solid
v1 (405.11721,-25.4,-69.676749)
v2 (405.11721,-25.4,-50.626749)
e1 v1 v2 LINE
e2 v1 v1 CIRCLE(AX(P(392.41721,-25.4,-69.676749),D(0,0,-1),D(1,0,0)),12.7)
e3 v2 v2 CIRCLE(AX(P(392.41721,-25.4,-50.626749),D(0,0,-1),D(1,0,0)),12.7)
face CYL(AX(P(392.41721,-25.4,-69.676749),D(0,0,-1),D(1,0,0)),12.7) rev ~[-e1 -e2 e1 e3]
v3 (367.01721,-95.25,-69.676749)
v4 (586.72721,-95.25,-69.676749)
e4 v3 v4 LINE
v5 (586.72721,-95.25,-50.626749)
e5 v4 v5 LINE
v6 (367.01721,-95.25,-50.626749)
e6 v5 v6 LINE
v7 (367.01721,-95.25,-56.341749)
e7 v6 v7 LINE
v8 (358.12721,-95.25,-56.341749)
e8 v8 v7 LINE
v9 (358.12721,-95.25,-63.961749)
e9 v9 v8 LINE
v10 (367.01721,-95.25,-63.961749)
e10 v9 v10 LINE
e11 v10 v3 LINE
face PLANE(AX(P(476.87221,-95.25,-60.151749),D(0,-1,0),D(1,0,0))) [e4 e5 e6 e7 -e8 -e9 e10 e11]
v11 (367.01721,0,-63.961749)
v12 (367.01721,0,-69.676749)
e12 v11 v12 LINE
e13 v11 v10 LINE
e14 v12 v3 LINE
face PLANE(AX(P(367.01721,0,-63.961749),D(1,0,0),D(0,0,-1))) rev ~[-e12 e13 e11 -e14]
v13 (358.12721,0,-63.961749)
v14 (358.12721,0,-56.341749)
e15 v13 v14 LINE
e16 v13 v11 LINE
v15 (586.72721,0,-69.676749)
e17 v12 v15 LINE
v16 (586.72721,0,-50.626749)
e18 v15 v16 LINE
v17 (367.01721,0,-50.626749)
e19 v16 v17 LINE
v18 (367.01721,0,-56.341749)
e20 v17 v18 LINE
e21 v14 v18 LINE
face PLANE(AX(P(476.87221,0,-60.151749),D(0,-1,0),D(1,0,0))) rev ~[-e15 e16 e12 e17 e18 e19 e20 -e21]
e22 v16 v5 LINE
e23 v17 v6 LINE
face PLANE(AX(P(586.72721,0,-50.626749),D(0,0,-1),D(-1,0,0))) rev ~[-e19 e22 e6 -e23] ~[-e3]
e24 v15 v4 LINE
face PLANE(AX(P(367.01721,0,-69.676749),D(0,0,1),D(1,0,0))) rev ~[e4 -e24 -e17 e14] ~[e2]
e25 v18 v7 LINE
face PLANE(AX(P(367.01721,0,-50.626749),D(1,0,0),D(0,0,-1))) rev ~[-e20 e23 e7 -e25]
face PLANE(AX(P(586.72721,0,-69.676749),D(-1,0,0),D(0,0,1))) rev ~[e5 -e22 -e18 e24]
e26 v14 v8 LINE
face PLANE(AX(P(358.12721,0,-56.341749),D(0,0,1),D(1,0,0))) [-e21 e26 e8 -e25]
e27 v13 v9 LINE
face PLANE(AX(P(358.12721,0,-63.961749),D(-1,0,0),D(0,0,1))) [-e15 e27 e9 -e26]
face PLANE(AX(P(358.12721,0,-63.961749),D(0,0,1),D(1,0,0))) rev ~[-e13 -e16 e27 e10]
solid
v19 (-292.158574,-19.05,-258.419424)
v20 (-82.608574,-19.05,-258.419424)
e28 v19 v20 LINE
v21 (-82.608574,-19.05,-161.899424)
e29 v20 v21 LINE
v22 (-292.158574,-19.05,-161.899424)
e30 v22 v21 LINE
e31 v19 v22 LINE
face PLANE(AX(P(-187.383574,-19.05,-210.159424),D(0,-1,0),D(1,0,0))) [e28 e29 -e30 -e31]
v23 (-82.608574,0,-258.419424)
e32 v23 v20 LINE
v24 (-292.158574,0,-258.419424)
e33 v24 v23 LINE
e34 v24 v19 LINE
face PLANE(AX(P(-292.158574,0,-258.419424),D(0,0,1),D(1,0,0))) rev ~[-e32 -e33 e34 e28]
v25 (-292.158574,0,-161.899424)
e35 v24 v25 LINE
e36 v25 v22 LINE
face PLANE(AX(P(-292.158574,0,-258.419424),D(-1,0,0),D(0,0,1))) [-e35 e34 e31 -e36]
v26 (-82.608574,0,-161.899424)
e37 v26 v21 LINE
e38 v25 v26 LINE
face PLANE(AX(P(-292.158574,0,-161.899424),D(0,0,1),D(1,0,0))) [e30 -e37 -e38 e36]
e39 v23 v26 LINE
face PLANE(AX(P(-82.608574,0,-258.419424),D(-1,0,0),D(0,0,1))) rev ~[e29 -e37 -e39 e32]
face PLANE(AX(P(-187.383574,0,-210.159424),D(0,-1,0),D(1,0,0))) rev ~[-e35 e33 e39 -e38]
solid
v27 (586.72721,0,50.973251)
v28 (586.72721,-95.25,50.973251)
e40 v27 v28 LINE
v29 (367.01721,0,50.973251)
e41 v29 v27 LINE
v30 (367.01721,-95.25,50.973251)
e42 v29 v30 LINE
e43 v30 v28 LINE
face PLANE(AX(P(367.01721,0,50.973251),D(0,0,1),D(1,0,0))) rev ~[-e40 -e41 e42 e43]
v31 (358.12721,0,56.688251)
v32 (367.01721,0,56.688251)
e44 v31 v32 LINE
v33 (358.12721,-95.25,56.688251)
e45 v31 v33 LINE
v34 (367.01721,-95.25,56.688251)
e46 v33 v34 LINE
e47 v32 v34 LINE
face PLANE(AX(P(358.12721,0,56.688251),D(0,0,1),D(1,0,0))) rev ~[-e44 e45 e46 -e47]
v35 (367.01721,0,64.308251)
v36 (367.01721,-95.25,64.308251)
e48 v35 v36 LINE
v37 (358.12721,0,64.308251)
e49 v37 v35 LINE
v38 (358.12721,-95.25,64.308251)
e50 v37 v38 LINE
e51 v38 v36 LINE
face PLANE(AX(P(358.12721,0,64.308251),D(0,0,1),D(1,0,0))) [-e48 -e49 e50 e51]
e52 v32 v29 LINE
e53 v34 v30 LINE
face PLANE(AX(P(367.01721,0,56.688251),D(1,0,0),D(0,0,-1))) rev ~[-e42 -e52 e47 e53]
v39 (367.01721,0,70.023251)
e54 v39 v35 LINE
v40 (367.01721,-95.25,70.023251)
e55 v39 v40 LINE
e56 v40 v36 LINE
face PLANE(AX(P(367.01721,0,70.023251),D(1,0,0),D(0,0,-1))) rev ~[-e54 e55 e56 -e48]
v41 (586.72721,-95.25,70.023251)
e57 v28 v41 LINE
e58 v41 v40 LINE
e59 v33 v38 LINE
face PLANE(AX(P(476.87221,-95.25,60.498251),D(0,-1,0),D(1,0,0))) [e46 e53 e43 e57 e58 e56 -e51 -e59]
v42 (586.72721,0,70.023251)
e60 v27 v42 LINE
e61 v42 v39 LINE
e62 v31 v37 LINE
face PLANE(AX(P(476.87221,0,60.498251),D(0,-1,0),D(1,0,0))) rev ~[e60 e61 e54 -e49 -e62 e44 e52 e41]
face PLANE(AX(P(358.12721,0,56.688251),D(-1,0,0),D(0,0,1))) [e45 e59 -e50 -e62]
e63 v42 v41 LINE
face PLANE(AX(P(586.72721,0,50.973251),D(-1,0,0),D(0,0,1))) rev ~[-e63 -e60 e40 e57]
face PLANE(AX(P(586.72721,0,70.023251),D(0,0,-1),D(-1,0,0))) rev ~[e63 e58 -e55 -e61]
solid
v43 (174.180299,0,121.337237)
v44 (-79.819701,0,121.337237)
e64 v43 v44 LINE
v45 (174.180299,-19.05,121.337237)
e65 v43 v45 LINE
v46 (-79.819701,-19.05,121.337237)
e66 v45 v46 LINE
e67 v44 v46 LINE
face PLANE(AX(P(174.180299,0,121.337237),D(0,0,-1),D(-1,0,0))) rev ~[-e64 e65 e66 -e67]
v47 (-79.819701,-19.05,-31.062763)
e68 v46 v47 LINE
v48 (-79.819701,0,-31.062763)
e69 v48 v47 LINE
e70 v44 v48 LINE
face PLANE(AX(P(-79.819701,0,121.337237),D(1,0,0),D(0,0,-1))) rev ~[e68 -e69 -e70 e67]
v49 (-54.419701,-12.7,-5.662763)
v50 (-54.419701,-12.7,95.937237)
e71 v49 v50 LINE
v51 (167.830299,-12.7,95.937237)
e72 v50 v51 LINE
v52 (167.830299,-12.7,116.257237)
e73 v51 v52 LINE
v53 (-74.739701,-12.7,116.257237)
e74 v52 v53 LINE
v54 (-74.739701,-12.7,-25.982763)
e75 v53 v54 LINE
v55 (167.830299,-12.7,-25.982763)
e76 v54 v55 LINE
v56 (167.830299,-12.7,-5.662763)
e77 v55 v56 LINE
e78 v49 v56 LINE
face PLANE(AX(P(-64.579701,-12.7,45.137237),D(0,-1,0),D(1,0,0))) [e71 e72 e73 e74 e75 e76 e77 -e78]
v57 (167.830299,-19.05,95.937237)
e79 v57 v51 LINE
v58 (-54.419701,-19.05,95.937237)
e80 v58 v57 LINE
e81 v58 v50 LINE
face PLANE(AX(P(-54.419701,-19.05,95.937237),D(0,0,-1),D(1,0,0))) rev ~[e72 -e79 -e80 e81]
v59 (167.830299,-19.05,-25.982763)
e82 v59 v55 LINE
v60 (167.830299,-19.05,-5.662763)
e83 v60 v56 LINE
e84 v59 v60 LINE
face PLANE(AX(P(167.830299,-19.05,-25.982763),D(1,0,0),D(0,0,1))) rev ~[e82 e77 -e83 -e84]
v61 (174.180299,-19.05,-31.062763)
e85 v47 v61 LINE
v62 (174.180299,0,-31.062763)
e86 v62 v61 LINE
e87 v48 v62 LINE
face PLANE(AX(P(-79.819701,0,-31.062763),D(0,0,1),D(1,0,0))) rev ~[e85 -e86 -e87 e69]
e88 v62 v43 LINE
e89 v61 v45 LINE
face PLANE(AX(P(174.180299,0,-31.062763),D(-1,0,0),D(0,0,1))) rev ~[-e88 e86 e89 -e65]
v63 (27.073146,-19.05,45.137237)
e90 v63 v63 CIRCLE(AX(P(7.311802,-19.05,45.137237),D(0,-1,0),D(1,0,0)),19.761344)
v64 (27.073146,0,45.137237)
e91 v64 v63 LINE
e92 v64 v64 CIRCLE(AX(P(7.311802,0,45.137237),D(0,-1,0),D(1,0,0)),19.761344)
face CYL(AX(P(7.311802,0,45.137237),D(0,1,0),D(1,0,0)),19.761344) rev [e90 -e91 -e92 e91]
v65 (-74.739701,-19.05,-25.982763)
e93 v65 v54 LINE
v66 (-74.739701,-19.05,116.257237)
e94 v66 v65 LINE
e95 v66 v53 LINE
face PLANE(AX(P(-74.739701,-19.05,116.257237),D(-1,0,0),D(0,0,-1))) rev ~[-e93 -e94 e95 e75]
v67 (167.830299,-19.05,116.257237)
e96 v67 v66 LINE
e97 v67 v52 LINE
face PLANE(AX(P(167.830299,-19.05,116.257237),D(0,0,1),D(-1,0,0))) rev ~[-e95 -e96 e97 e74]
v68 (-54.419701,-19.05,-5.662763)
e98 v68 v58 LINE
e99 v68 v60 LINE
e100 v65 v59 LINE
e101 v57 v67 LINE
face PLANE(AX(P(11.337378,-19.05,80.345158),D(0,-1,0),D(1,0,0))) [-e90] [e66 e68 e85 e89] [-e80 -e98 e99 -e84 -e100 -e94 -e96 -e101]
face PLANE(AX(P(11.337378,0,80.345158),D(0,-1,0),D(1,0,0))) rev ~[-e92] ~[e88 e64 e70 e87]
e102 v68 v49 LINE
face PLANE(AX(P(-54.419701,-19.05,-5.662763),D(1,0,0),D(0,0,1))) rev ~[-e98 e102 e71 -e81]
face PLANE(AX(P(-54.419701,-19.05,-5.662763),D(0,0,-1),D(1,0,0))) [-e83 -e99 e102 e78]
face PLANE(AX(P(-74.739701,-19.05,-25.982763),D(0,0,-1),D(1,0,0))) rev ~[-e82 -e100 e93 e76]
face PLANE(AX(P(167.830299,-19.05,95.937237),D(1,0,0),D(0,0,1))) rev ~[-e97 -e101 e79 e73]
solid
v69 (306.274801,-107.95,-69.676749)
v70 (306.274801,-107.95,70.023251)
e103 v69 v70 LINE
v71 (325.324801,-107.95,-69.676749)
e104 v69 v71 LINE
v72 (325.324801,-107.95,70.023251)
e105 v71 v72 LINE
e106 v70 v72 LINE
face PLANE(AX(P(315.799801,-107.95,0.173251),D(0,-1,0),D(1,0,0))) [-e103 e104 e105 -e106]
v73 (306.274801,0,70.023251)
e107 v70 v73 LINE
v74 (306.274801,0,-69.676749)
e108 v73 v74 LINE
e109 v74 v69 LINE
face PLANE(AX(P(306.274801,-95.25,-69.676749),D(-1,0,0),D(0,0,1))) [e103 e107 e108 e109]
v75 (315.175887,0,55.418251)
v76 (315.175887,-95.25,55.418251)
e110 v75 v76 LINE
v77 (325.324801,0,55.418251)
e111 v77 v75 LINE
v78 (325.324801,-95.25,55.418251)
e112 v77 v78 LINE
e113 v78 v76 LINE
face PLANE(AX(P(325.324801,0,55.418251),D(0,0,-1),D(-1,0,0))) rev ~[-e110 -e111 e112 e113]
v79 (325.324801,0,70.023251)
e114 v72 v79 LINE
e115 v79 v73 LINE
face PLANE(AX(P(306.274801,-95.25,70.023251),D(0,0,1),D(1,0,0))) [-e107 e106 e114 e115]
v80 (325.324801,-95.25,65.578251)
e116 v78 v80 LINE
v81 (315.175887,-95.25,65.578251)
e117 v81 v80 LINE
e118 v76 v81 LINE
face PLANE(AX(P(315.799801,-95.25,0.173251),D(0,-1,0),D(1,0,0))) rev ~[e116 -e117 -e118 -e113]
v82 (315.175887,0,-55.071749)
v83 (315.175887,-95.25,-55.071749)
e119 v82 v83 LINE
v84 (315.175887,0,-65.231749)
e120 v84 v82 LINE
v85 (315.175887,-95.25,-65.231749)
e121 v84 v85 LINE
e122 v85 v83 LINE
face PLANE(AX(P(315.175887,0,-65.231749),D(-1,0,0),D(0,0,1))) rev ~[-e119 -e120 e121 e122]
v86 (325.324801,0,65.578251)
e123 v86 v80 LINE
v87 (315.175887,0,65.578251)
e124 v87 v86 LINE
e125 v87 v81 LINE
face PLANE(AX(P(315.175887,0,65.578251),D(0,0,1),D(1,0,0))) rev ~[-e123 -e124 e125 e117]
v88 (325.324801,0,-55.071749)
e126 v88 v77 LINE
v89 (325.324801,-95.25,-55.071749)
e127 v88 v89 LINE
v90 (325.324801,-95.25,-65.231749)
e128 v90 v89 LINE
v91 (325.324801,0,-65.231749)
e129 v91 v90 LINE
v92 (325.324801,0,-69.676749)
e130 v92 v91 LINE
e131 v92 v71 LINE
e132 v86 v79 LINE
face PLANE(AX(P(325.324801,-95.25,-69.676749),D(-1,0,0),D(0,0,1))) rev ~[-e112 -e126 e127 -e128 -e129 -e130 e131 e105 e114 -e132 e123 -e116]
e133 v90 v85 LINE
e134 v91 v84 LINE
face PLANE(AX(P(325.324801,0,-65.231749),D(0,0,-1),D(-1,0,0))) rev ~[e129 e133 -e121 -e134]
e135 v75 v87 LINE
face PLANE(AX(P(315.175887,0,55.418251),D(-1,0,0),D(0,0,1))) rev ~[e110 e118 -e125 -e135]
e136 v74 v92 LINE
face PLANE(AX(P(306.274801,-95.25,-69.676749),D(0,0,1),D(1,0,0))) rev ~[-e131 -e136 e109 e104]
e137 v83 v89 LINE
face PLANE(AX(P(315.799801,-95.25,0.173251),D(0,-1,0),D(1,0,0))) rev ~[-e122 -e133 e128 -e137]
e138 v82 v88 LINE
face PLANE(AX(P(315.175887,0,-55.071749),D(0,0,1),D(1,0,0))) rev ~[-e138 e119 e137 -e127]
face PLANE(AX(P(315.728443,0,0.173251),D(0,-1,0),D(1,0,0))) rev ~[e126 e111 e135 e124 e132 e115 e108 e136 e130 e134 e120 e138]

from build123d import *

# Parameters (mm, degrees)
F0_R     = 19.7613438491
F0_W     = 222.25
F0_H     = 20.32
F0_W_2   = 6.35
F1_DEPTH = 19.05
F2_W     = 222.25
F2_H     = 20.32
F3_DEPTH = 6.35
F4_DEPTH = 95.25
F0_W_3   = 8.89
F0_H_2   = 7.62
F5_R     = 12.7
F6_DEPTH = 191.0149866296
F7_W     = 19.05
F7_H     = 139.7
F8_DEPTH = 12.7
F0_W_4   = 209.55
F0_H_3   = 96.52
F9_DEPTH = 19.05


# Not quite as in the source:
# - a feature names something its author has since deleted; it is built from what else it names


with BuildPart() as f1:
    # F0 (on Front) → F1 (new body)
    with BuildSketch(Plane.XZ):
        Polygon((167.8302989408, 95.9372372214), (167.8302989408, 116.2572372214), (-74.7397010592, 116.2572372214), (-74.7397010592, -25.9827627786), (-54.4197010592, -25.9827627786), (-54.4197010592, -5.6627627786), (-54.4197010592, 95.9372372214), align=None)
        Polygon((174.1802989408, -5.6627627786), (174.1802989408, 95.9372372214), (167.8302989408, 95.9372372214), (-54.4197010592, 95.9372372214), (-54.4197010592, -5.6627627786), (167.8302989408, -5.6627627786), align=None)
        with Locations((7.3118018918, 45.1372372214)):
            Circle(F0_R, mode=Mode.SUBTRACT)
        with Locations((56.7052989408, -15.8227627786)):
            Rectangle(F0_W, F0_H)
        Polygon((174.1802989408, 121.3372372214), (-79.8197010592, 121.3372372214), (-79.8197010592, -31.0627627786), (174.1802989408, -31.0627627786), (174.1802989408, -25.9827627786), (167.8302989408, -25.9827627786), (-54.4197010592, -25.9827627786), (-74.7397010592, -25.9827627786), (-74.7397010592, 116.2572372214), (167.8302989408, 116.2572372214), (174.1802989408, 116.2572372214), align=None)
        with Locations((171.0052989408, 106.0972372214)):
            Rectangle(F0_W_2, F0_H)
        with Locations((171.0052989408, -15.8227627786)):
            Rectangle(F0_W_2, F0_H)
    extrude(amount=F1_DEPTH)

    # F2 (on face) → F3 (cut)
    with BuildSketch(Plane.XZ.offset(19.05)):
        Polygon((-54.4197010592, 116.2572372214), (-74.7397010592, 116.2572372214), (-74.7397010592, -25.9827627786), (-54.4197010592, -25.9827627786), (-54.4197010592, -5.6627627786), (-54.4197010592, 95.9372372214), align=None)
        with Locations((56.7052989408, 106.0972372214)):
            Rectangle(F2_W, F2_H)
        with Locations((56.7052989408, -15.8227627786)):
            Rectangle(F2_W, F2_H)
    extrude(amount=-F3_DEPTH, mode=Mode.SUBTRACT)


with BuildPart() as f4:
    # F0 (on Front) → F4 (new body)
    with BuildSketch(Plane.XZ):
        Polygon((325.3248014927, 70.0232505918), (306.2748014927, 70.0232505918), (306.2748014927, -69.6767494082), (325.3248014927, -69.6767494082), (325.3248014927, -65.2317494082), (315.1758867264, -65.2317494082), (315.1758867264, -55.0717494082), (325.3248014927, -55.0717494082), (325.3248014927, 55.4182505918), (315.1758867264, 55.4182505918), (315.1758867264, 65.5782505918), (325.3248014927, 65.5782505918), align=None)
    extrude(amount=F4_DEPTH)

    # F7 (on face) → F8 (join)
    with BuildSketch(Plane.XZ.offset(95.25)):
        with Locations((315.7998014927, 0.1732505918)):
            Rectangle(F7_W, F7_H)
    extrude(amount=F8_DEPTH)


with BuildPart() as f4b:
    # F0 (on Front) → F4, piece 2 (new body)
    with BuildSketch(Plane.XZ):
        Polygon((586.7272095299, 70.0232505918), (367.0172095299, 70.0232505918), (367.0172095299, 64.3082505918), (367.0172095299, 56.6882505918), (367.0172095299, 50.9732505918), (586.7272095299, 50.9732505918), align=None)
        with Locations((362.5722095299, 60.4982505918)):
            Rectangle(F0_W_3, F0_H_2)
    extrude(amount=F4_DEPTH)


with BuildPart() as f4c:
    # F0 (on Front) → F4, piece 3 (new body)
    with BuildSketch(Plane.XZ):
        Polygon((586.7272095299, -50.6267494082), (367.0172095299, -50.6267494082), (367.0172095299, -56.3417494082), (367.0172095299, -63.9617494082), (367.0172095299, -69.6767494082), (586.7272095299, -69.6767494082), align=None)
        with Locations((362.5722095299, -60.1517494082)):
            Rectangle(F0_W_3, F0_H_2)
    extrude(amount=F4_DEPTH)

    # F5 (on face) → F6 (cut, through all)
    with BuildSketch(Plane(origin=(0, 0, -69.6767494082), x_dir=(1, 0, 0), z_dir=(0, 0, -1))):
        with Locations((392.4172095299, 25.4)):
            Circle(F5_R)
    extrude(amount=-F6_DEPTH, mode=Mode.SUBTRACT)


with BuildPart() as f9:
    # F0 (on Front) → F9 (new body)
    with BuildSketch(Plane.XZ):
        with Locations((-187.3835738659, -210.1594242954)):
            Rectangle(F0_W_4, F0_H_3)
    extrude(amount=F9_DEPTH)


solid = Compound([f1.part, f4.part, f4b.part, f4c.part, f9.part])
